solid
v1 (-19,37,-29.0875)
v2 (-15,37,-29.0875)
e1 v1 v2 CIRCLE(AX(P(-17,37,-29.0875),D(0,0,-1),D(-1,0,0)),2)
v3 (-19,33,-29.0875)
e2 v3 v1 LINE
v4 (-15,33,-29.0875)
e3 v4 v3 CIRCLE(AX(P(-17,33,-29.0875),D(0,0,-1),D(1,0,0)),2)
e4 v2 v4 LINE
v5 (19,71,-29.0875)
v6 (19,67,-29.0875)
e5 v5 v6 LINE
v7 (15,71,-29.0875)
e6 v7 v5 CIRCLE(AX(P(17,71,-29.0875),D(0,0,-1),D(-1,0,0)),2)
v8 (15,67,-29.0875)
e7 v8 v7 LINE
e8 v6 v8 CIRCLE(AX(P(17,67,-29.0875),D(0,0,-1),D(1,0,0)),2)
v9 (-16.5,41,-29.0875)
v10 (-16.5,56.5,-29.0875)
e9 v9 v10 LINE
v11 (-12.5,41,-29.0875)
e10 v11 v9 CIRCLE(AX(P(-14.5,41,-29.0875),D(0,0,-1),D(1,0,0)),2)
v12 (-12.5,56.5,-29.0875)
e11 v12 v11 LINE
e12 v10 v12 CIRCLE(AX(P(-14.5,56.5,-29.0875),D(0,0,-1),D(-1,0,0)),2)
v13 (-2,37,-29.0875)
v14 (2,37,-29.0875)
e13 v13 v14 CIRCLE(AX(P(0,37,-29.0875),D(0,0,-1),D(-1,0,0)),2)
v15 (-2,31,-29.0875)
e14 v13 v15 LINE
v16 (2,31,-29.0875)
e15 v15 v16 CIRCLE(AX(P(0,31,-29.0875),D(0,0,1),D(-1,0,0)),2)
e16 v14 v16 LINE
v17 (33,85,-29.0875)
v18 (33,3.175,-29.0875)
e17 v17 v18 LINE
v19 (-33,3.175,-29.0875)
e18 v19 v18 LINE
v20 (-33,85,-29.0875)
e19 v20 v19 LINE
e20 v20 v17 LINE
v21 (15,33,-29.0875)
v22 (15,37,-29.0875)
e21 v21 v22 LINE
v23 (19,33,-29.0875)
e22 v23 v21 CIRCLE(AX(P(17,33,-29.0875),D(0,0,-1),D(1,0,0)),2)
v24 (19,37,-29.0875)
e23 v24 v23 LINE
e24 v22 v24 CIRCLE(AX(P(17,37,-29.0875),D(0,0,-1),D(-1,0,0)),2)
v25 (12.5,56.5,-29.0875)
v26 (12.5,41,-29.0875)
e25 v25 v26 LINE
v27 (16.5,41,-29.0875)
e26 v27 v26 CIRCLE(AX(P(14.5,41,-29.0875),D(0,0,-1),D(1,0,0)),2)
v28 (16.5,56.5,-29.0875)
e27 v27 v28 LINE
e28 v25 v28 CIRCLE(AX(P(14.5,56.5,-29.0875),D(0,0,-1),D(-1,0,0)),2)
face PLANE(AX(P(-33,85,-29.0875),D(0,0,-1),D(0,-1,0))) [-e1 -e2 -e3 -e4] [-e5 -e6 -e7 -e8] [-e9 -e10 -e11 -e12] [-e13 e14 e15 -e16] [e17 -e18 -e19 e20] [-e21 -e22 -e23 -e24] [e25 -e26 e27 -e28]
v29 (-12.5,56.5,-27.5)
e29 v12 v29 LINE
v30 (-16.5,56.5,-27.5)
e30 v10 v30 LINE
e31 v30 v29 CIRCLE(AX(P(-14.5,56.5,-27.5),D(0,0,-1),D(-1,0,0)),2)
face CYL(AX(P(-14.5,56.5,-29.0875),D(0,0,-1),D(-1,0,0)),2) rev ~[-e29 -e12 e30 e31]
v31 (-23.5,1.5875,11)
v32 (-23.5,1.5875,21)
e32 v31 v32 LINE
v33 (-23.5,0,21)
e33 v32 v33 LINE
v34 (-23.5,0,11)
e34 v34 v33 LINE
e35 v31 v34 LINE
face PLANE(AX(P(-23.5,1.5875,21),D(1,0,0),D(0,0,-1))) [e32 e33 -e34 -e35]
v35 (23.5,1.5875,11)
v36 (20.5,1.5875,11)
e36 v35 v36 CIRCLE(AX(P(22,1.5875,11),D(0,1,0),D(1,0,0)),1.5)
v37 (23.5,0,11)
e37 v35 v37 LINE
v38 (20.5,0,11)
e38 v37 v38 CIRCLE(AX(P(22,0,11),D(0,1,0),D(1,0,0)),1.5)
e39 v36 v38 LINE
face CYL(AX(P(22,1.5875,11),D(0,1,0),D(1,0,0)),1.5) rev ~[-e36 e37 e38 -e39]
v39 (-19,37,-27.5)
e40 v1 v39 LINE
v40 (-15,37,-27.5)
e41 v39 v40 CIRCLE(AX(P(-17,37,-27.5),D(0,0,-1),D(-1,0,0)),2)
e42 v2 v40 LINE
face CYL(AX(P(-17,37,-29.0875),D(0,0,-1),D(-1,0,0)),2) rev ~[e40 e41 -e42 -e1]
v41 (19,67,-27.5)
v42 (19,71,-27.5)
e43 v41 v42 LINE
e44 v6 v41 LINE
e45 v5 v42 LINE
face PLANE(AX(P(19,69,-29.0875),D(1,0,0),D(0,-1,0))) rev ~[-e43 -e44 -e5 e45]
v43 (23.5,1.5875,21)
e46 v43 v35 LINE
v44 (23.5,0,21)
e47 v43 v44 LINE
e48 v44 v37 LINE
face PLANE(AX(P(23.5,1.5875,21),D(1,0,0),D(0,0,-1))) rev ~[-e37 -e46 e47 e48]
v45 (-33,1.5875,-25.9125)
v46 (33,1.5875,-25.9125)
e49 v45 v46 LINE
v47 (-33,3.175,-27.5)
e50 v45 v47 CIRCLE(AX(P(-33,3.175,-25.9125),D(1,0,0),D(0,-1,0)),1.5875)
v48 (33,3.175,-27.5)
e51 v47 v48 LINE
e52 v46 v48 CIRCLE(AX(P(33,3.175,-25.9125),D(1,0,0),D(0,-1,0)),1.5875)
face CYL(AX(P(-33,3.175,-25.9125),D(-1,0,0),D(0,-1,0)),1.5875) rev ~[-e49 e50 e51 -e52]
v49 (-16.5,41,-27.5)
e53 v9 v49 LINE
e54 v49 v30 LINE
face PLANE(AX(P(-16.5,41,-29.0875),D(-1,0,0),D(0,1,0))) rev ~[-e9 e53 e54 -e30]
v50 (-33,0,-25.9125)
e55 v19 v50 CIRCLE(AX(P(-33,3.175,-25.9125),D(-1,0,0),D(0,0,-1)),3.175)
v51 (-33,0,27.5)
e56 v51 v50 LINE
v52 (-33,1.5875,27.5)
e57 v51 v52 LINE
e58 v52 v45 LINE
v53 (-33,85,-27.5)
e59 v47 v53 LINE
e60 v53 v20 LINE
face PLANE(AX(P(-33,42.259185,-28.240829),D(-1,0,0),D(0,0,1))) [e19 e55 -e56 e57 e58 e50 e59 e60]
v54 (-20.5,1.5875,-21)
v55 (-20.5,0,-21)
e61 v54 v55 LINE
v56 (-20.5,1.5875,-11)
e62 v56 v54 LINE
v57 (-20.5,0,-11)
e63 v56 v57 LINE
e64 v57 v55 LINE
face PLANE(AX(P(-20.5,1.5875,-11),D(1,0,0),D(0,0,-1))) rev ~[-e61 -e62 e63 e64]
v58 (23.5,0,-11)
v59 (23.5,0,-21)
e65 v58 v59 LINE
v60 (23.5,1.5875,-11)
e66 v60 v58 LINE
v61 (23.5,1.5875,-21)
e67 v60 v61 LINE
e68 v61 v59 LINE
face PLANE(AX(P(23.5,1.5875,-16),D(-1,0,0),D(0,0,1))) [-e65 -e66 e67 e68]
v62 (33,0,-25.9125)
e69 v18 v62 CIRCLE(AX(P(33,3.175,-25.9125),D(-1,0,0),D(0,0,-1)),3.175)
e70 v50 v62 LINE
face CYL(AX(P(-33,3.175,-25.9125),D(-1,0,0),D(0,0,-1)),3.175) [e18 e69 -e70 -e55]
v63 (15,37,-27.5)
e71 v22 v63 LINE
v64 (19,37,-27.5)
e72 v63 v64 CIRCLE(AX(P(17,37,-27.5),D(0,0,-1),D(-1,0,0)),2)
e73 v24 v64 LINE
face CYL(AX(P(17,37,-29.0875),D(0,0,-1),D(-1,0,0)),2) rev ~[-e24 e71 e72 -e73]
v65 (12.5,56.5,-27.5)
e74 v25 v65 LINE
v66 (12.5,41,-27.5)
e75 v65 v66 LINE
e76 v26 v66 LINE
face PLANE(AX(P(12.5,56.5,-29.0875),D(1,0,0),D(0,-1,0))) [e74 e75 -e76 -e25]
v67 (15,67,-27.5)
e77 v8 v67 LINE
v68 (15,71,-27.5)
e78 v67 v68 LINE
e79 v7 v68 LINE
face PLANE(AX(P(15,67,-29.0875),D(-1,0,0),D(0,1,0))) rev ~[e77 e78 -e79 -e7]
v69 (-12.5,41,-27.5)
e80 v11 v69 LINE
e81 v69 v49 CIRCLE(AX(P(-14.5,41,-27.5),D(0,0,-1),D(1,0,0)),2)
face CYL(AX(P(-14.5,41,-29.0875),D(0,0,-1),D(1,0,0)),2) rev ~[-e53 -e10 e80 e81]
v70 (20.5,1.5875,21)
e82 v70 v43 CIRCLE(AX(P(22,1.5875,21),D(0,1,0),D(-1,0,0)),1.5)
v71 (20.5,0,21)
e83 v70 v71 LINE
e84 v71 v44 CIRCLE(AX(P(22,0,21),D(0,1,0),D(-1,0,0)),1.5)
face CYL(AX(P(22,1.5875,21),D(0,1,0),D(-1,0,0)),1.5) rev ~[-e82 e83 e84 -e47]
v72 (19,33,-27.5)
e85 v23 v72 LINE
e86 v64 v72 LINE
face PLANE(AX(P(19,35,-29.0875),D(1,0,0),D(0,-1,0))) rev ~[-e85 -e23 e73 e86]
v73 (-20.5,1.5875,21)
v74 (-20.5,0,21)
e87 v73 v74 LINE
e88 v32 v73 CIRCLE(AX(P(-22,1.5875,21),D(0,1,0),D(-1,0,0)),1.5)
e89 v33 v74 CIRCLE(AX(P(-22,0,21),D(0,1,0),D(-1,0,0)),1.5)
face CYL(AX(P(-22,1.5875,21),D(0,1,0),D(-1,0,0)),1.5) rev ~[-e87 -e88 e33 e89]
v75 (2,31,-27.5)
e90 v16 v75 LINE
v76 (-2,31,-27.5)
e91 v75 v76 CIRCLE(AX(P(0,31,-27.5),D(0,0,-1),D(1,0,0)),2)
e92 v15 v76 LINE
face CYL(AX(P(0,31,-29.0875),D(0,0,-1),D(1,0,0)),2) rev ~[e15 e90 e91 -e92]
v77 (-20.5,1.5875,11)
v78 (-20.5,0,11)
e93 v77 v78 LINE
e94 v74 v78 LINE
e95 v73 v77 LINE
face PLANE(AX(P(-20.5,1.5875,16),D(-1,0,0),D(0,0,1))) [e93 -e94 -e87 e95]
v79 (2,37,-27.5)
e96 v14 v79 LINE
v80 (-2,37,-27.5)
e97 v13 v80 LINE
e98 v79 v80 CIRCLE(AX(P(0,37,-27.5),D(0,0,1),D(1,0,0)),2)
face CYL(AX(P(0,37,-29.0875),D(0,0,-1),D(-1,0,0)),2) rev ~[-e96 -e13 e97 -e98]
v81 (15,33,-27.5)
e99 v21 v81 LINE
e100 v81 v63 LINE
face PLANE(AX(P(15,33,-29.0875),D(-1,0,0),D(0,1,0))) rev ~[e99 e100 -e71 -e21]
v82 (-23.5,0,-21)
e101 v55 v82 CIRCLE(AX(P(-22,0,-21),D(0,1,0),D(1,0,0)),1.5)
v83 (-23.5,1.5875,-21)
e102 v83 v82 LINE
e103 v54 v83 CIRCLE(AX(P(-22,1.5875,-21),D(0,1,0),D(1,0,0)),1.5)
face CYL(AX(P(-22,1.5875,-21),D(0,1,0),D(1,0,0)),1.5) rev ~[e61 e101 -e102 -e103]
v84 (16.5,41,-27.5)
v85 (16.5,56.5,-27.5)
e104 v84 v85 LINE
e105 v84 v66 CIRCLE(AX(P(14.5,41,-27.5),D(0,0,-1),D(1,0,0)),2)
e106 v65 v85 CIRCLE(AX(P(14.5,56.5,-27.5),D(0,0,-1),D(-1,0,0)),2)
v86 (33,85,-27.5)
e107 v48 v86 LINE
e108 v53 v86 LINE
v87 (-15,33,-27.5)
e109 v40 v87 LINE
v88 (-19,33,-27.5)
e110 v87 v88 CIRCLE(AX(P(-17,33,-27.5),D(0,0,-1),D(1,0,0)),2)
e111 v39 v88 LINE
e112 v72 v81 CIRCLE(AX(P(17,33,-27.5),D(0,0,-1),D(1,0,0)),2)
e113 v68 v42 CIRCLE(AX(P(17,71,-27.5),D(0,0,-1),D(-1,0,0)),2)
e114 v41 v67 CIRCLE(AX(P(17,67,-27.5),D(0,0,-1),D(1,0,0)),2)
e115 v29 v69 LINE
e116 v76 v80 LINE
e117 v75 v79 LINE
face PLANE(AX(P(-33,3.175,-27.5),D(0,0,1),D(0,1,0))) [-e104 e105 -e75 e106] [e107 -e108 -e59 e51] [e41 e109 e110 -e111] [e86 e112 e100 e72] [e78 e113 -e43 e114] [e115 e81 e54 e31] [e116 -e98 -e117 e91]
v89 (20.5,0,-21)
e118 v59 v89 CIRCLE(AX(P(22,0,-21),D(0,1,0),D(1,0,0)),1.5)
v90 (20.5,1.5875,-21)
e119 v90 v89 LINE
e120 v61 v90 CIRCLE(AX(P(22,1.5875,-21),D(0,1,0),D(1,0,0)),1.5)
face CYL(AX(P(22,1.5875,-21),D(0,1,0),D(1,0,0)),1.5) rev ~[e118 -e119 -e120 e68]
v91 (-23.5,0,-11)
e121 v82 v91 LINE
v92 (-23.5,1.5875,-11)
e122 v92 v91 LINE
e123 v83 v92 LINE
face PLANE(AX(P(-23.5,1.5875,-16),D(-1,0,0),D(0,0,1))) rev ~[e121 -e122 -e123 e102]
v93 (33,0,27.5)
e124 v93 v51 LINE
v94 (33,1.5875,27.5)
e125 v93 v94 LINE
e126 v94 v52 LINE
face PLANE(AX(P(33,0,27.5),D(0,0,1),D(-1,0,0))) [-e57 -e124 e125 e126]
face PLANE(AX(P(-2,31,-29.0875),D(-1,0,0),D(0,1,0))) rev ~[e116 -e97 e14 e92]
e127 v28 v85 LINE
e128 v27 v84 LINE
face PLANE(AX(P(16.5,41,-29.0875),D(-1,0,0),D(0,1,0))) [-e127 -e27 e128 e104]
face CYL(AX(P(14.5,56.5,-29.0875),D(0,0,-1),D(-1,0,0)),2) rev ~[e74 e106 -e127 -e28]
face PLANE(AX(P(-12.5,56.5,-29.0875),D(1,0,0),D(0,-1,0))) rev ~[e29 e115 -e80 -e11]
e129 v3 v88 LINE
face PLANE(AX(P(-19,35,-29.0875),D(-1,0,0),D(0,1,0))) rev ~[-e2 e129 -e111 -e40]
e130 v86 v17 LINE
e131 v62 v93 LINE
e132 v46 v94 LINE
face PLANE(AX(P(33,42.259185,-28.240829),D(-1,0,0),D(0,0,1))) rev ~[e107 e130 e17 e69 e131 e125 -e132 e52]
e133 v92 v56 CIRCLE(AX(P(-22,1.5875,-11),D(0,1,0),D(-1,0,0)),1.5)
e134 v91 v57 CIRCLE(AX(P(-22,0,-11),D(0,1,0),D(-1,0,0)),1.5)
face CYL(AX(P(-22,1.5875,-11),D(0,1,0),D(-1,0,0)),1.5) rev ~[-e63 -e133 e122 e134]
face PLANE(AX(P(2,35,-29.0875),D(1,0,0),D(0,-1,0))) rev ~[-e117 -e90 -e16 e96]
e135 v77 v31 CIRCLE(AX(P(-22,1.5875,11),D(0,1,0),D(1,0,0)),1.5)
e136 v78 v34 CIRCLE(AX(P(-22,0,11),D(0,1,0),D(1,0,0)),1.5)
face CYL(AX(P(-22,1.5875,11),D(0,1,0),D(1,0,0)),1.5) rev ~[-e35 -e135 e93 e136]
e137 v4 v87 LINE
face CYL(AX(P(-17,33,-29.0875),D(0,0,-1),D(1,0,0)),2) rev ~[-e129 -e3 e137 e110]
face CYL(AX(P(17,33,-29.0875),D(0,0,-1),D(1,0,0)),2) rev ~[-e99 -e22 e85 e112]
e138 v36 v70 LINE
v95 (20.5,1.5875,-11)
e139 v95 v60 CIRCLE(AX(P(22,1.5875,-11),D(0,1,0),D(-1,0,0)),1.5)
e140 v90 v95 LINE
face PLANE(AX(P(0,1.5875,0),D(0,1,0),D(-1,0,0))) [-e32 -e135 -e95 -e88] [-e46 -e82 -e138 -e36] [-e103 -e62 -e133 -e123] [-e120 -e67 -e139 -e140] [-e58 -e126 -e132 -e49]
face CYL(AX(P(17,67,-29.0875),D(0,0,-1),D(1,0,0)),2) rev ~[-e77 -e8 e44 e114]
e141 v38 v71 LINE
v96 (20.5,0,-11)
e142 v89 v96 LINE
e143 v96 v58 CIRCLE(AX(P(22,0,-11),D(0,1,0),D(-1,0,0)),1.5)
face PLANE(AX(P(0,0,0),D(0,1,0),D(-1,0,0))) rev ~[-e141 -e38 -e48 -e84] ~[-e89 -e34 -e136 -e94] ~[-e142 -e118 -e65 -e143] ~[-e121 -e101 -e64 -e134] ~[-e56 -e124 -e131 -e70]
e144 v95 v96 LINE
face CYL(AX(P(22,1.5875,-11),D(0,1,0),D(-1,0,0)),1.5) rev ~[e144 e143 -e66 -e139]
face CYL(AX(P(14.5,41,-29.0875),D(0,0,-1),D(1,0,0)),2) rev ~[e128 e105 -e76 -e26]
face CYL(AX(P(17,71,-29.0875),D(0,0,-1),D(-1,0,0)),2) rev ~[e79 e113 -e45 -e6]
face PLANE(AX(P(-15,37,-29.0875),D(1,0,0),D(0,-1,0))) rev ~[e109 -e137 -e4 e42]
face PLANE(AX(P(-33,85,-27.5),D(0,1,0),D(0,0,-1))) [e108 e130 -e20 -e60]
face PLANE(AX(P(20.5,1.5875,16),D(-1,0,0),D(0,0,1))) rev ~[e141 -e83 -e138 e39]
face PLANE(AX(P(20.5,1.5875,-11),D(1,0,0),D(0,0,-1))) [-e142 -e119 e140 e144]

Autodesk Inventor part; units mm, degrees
ref_plane "YZ Plane" through (0, 0, 0) normal (1, 0, 0) x (0, 1, 0)
ref_plane "XZ Plane" through (0, 0, 0) normal (0, 1, 0) x (-1, 0, 0)
ref_plane "XY Plane" through (0, 0, 0) normal (0, 0, 1) x (1, 0, 0)
sketch "Sketch1" plane through (0, 0, 0) normal (0, 1, 0) x (-1, 0, 0)
  line L0 (33, -27.5) -> (-33, -27.5)
  line L1 (-33, -27.5) -> (-33, 27.5)
  line L2 (-33, 27.5) -> (33, 27.5)
  line L3 (33, 27.5) -> (33, -27.5)
  line L4 (33, -27.5) -> (-33, 27.5) construction
  line L5 (-33, -27.5) -> (33, 27.5) construction
  point P0 (0, 0)
  dimension "d0" = 66
  dimension "d1" = 55
extrude "Plate1" add sketch "Sketch1" along normal blind 1.5875
sketch "Sketch3" plane through (0, 1.5875, 0) normal (0, 1, 0) x (1, 0, 0)
  line L0 (0, 0) -> (-33, 0)
  line L1 (-33, 0) -> (-33, 27.5)
  line L2 (-33, 27.5) -> (0, 27.5)
  line L3 (0, 27.5) -> (0, 0)
  circle A0 centre (-22, 16) radius 1.5
  circle A1 centre (-22, -16) radius 1.5
  circle A2 centre (22, 16) radius 1.5
  circle A3 centre (22, -16) radius 1.5
  line L4 (-22, 11) -> (-22, 21) construction
  line L5 (-20.5, 11) -> (-20.5, 21)
  line L6 (-23.5, 21) -> (-23.5, 11)
  arc A4 (-23.5, 11) -> (-20.5, 11) centre (-22, 11) ccw
  arc A5 (-20.5, 21) -> (-23.5, 21) centre (-22, 21) ccw
  line L7 (20.5, 11) -> (20.5, 21)
  line L8 (23.5, 21) -> (23.5, 11)
  arc A6 (20.5, 11) -> (23.5, 11) centre (22, 11) ccw
  arc A7 (23.5, 21) -> (20.5, 21) centre (22, 21) ccw
  line L9 (-20.5, -11) -> (-20.5, -21)
  line L10 (-23.5, -21) -> (-23.5, -11)
  arc A8 (-20.5, -11) -> (-23.5, -11) centre (-22, -11) ccw
  arc A9 (-23.5, -21) -> (-20.5, -21) centre (-22, -21) ccw
  arc A10 (20.5, -21) -> (23.5, -21) centre (22, -21) ccw
  line L11 (23.5, -21) -> (23.5, -11)
  line L12 (20.5, -11) -> (20.5, -21)
  arc A11 (23.5, -11) -> (20.5, -11) centre (22, -11) ccw
  dimension "d22" = 3
  dimension "d23" = 32
  dimension "d24" = 22
  dimension "d48" = 5
  dimension "d49" = 3
extrude "Cut1" cut sketch "Sketch3" against normal blind 1.5875 contours A0 | L5 A4 L6 A0 | A0 L6 A5 L5 | A1 | L9 A9 L10 A1 | A1 L10 A8 L9 | A2 | L8 A6 L7 A2 | A2 L7 A7 L8 | A3 | L11 A10 L12 A3 | A3 L12 A11 L11
sketch "Sketch2" plane through (-33, 1.5875, -27.5) normal (0, 0, -1) x (-1, 0, 0)
  line L0 (-66, 0) -> (0, 0)
  line L1 (0, 0) -> (0, 83.4125)
  line L2 (0, 83.4125) -> (-66, 83.4125)
  line L3 (-66, 83.4125) -> (-66, 0)
edge flange "Flange1" height 85 angle 90 thickness 1.5875 bend radius 1.5875 thickness toward (0, 0, -1) relief tear relief width 1.5875 relief depth 0.7937 edges at (0, 1.5875, -27.5) wall of the first edge with corners at (33, 1.5875, -27.5) (-33, 1.5875, -27.5) (-33, 85, -27.5) (33, 85, -27.5)
bend "Bend1"
corner "Corner1"
sketch "Sketch4" plane through (33, 85, -29.0875) normal (0, 0, -1) x (-1, 0, 0)
  line L0 (0, -81.825) -> (66, -81.825) projected
  line L1 (66, 0) -> (66, -81.825) projected
  line L2 (0, 0) -> (66, 0) projected
  line L3 (33, -54) -> (33, -48) construction
  line L4 (35, -54) -> (35, -48)
  line L5 (31, -48) -> (31, -54)
  arc A0 (31, -54) -> (35, -54) centre (33, -54) ccw
  arc A1 (35, -48) -> (31, -48) centre (33, -48) ccw
  line L6 (33, -81.825) -> (33, 0)
  line L7 (47.5, -44) -> (47.5, -28.5) construction
  line L8 (49.5, -44) -> (49.5, -28.5)
  line L9 (45.5, -28.5) -> (45.5, -44)
  arc A2 (45.5, -44) -> (49.5, -44) centre (47.5, -44) ccw
  arc A3 (49.5, -28.5) -> (45.5, -28.5) centre (47.5, -28.5) ccw
  line L10 (18.5, -44) -> (18.5, -28.5) construction
  line L11 (16.5, -44) -> (16.5, -28.5)
  line L12 (20.5, -28.5) -> (20.5, -44)
  arc A4 (16.5, -44) -> (20.5, -44) centre (18.5, -44) ccw
  arc A5 (20.5, -28.5) -> (16.5, -28.5) centre (18.5, -28.5) ccw
  line L13 (66, -85) -> (0, -85) projected
  line L14 (16, -50) -> (50, -50)
  line L15 (50, -50) -> (50, -16)
  line L16 (50, -16) -> (16, -16)
  line L17 (16, -16) -> (16, -50)
  circle A6 centre (16, -16) radius 2
  circle A7 centre (16, -50) radius 2
  circle A8 centre (50, -50) radius 2
  line L18 (33, -16) -> (33, -50)
  line L19 (16, -18) -> (16, -14) construction
  line L20 (18, -18) -> (18, -14)
  line L21 (14, -14) -> (14, -18)
  arc A9 (14, -18) -> (18, -18) centre (16, -18) ccw
  arc A10 (18, -14) -> (14, -14) centre (16, -14) ccw
  line L22 (16, -52) -> (16, -48) construction
  line L23 (18, -52) -> (18, -48)
  line L24 (14, -48) -> (14, -52)
  arc A11 (14, -52) -> (18, -52) centre (16, -52) ccw
  arc A12 (18, -48) -> (14, -48) centre (16, -48) ccw
  line L25 (50, -52) -> (50, -48) construction
  line L26 (52, -52) -> (52, -48)
  line L27 (48, -48) -> (48, -52)
  arc A13 (48, -52) -> (52, -52) centre (50, -52) ccw
  arc A14 (52, -48) -> (48, -48) centre (50, -48) ccw
  point P0 (33, -85)
  point P1 (33, -51)
  point P2 (47.5, -36.25)
  point P3 (18.5, -36.25)
  dimension "d25" = 3
  dimension "d26" = 4
  dimension "d29" = 4
  dimension "d30" = 15.5
  dimension "d31" = 14.5
  dimension "d46" = 48.75
  dimension "d47" = 34
  dimension "d50" = 34
  dimension "d51" = 34
  dimension "d52" = 4
  dimension "d53" = 4
  dimension "d54" = 4
  dimension "d55" = 35
  dimension "d56" = 0
  dimension "d57" = 2
  dimension "d58" = 4
  dimension "d59" = 2
  dimension "d60" = 4
  dimension "d61" = 2
  dimension "d62" = 4
extrude "Cut2" cut sketch "Sketch4" against normal blind 1.5875 contours L6 L14 L4 A0 | A0 L5 L14 L6 | L14 L5 A1 L6 | L6 A1 L4 L14 | A7 L17 L14 | L14 L17 A7 | L23 A11 L24 A7 | A7 L17 A12 L23 | A8 L15 L14 | L27 A14 L15 A8 | L14 L15 A8 | A8 L26 A13 L27 | A6 L17 L16 | L16 L17 A6 | L20 A9 L17 A6 | A6 L21 A10 L20 | A7 L24 A12 L17 | L15 A14 L26 A8 | A6 L17 A9 L21 | A2 L9 A3 L8 | L11 A5 L12 A4
equation "\"d0\" = subframe_x"
equation "\"d1\" = subframe_y"
equation "\"d22\" = m3_diameter"
equation "\"d23\" = 0.4 * frame_y"
equation "\"d24\" = 0.333333 * subframe_x"
equation "\"d49\" = m3_diameter"
equation "\"d20\" = Thickness"
equation "\"d26\" = m4_diameter"
equation "\"d29\" = m4_diameter"
equation "\"d33\" = Thickness"
equation "\"Thickness\" = sm_thickness"
equation "\"d3\" = BendReliefWidth"
equation "\"d4\" = BendReliefDepth"
equation "\"d5\" = MinimumRemnant"
equation "\"d6\" = BendRadius"
equation "\"d7\" = galvo_frame_z"
equation "\"d9\" = BendRadius"
equation "\"d11\" = CornerReliefSize"
equation "\"d12\" = GapSize"
equation "\"d13\" = JacobiRadiusSize"
equation "\"BendRadius\" = Thickness"
equation "\"BendReliefWidth\" = Thickness"
equation "\"BendReliefDepth\" = 0.5 * Thickness"
equation "\"CornerReliefSize\" = 4 * Thickness"
equation "\"MinimumRemnant\" = 2 * Thickness"
equation "\"TransitionRadius\" = BendRadius"
equation "\"JacobiRadiusSize\" = BendRadius"
equation "\"GapSize\" = Thickness"
equation "\"sm_thickness\" = 1.5875"
equation "\"very_thick_acrylic\" = 9.45"
equation "\"thick_acrylic\" = 5.88"
equation "\"thin_acrylic\" = 3.15"
equation "\"clear_acrylic\" = 3.15"
equation "\"wood_thickness\" = 6.72"
equation "\"m3_diameter\" = 3"
equation "\"m3_head\" = 6"
equation "\"m4_diameter\" = 4"
equation "\"m5_diameter\" = 5"
equation "\"m5_head\" = 10.3"
equation "\"brass_insert_drill\" = 4"
equation "\"m5_brass_insert_drill\" = 6.7"
equation "\"m3_press_nut_drill\" = 4.5"
equation "\"m5_press_nut_drill\" = 6.5"
equation "\"laser_body_diameter\" = 12"
equation "\"carrier_y\" = 251"
equation "\"carrier_z\" = 12"
equation "\"visor_x\" = 253.925"
equation "\"visor_y\" = 85.6"
equation "\"window_z\" = 332.225"
equation "\"window_y\" = 93.75"
equation "\"window_overlap\" = 48"
equation "\"acrylic_into_frame\" = 5"
equation "\"door_x\" = 251"
equation "\"door_z\" = 332.225"
equation "\"door_overlap\" = 48"
equation "\"reservoir_x\" = 201"
equation "\"reservoir_y\" = 201"
equation "\"linear_bearing_spacing\" = 271"
equation "\"tray_border\" = 25"
equation "\"tray_x\" = 251"
equation "\"tray_y\" = 251"
equation "\"bed_z\" = 25"
equation "\"crane_z2\" = 12"
equation "\"switch_spacing\" = 19"
equation "\"frame_top_z\" = 385"
equation "\"frame_bottom_z\" = 275"
equation "\"frame_total_z\" = 661.5875"
equation "\"frame_face_y\" = 45"
equation "\"frame_border\" = 48.0375"
equation "\"frame_foot_z\" = 12"
equation "\"frame_screw_from_center\" = 25"
equation "\"laser_y_offset\" = 19.4"
equation "\"laser_diameter\" = 12"
equation "\"laser_z_offset\" = 55"
equation "\"laser_y\" = 15"
equation "\"laser_z\" = 75"
equation "\"laser_gap\" = 1"
equation "\"subframe_x\" = 66"
equation "\"subframe_y\" = 55"
equation "\"galvo_frame_x\" = 66"
equation "\"galvo_frame_z\" = 85"
equation "\"galvo_frame_y_offset\" = 27.5"
equation "\"drawer_x\" = 257.3"
equation "\"drawer_y\" = 90.3375"
equation "\"drawer_z\" = 278.175"
equation "\"drawer_support_from_top\" = 48"
equation "\"drawer_screw_from_center\" = 55"
equation "\"nema17_x\" = 43"
equation "\"d2\" = BendRadius"
equation "\"d44\" = galvo_frame_x"
equation "\"al_thickness\" = 1.5875"
equation "\"rivet_diameter\" = 3.3"
equation "\"bend_factor\" = 2.26205"
equation "\"sm_bend\" = 3.591"
equation "\"al_bend\" = 3.591"
equation "\"frame_x\" = 353.375"
equation "\"carrier_z2\" = 25"
equation "\"carrier_y2\" = 76.825"
equation "\"frame_y\" = 80"
properties part number "subframe"
